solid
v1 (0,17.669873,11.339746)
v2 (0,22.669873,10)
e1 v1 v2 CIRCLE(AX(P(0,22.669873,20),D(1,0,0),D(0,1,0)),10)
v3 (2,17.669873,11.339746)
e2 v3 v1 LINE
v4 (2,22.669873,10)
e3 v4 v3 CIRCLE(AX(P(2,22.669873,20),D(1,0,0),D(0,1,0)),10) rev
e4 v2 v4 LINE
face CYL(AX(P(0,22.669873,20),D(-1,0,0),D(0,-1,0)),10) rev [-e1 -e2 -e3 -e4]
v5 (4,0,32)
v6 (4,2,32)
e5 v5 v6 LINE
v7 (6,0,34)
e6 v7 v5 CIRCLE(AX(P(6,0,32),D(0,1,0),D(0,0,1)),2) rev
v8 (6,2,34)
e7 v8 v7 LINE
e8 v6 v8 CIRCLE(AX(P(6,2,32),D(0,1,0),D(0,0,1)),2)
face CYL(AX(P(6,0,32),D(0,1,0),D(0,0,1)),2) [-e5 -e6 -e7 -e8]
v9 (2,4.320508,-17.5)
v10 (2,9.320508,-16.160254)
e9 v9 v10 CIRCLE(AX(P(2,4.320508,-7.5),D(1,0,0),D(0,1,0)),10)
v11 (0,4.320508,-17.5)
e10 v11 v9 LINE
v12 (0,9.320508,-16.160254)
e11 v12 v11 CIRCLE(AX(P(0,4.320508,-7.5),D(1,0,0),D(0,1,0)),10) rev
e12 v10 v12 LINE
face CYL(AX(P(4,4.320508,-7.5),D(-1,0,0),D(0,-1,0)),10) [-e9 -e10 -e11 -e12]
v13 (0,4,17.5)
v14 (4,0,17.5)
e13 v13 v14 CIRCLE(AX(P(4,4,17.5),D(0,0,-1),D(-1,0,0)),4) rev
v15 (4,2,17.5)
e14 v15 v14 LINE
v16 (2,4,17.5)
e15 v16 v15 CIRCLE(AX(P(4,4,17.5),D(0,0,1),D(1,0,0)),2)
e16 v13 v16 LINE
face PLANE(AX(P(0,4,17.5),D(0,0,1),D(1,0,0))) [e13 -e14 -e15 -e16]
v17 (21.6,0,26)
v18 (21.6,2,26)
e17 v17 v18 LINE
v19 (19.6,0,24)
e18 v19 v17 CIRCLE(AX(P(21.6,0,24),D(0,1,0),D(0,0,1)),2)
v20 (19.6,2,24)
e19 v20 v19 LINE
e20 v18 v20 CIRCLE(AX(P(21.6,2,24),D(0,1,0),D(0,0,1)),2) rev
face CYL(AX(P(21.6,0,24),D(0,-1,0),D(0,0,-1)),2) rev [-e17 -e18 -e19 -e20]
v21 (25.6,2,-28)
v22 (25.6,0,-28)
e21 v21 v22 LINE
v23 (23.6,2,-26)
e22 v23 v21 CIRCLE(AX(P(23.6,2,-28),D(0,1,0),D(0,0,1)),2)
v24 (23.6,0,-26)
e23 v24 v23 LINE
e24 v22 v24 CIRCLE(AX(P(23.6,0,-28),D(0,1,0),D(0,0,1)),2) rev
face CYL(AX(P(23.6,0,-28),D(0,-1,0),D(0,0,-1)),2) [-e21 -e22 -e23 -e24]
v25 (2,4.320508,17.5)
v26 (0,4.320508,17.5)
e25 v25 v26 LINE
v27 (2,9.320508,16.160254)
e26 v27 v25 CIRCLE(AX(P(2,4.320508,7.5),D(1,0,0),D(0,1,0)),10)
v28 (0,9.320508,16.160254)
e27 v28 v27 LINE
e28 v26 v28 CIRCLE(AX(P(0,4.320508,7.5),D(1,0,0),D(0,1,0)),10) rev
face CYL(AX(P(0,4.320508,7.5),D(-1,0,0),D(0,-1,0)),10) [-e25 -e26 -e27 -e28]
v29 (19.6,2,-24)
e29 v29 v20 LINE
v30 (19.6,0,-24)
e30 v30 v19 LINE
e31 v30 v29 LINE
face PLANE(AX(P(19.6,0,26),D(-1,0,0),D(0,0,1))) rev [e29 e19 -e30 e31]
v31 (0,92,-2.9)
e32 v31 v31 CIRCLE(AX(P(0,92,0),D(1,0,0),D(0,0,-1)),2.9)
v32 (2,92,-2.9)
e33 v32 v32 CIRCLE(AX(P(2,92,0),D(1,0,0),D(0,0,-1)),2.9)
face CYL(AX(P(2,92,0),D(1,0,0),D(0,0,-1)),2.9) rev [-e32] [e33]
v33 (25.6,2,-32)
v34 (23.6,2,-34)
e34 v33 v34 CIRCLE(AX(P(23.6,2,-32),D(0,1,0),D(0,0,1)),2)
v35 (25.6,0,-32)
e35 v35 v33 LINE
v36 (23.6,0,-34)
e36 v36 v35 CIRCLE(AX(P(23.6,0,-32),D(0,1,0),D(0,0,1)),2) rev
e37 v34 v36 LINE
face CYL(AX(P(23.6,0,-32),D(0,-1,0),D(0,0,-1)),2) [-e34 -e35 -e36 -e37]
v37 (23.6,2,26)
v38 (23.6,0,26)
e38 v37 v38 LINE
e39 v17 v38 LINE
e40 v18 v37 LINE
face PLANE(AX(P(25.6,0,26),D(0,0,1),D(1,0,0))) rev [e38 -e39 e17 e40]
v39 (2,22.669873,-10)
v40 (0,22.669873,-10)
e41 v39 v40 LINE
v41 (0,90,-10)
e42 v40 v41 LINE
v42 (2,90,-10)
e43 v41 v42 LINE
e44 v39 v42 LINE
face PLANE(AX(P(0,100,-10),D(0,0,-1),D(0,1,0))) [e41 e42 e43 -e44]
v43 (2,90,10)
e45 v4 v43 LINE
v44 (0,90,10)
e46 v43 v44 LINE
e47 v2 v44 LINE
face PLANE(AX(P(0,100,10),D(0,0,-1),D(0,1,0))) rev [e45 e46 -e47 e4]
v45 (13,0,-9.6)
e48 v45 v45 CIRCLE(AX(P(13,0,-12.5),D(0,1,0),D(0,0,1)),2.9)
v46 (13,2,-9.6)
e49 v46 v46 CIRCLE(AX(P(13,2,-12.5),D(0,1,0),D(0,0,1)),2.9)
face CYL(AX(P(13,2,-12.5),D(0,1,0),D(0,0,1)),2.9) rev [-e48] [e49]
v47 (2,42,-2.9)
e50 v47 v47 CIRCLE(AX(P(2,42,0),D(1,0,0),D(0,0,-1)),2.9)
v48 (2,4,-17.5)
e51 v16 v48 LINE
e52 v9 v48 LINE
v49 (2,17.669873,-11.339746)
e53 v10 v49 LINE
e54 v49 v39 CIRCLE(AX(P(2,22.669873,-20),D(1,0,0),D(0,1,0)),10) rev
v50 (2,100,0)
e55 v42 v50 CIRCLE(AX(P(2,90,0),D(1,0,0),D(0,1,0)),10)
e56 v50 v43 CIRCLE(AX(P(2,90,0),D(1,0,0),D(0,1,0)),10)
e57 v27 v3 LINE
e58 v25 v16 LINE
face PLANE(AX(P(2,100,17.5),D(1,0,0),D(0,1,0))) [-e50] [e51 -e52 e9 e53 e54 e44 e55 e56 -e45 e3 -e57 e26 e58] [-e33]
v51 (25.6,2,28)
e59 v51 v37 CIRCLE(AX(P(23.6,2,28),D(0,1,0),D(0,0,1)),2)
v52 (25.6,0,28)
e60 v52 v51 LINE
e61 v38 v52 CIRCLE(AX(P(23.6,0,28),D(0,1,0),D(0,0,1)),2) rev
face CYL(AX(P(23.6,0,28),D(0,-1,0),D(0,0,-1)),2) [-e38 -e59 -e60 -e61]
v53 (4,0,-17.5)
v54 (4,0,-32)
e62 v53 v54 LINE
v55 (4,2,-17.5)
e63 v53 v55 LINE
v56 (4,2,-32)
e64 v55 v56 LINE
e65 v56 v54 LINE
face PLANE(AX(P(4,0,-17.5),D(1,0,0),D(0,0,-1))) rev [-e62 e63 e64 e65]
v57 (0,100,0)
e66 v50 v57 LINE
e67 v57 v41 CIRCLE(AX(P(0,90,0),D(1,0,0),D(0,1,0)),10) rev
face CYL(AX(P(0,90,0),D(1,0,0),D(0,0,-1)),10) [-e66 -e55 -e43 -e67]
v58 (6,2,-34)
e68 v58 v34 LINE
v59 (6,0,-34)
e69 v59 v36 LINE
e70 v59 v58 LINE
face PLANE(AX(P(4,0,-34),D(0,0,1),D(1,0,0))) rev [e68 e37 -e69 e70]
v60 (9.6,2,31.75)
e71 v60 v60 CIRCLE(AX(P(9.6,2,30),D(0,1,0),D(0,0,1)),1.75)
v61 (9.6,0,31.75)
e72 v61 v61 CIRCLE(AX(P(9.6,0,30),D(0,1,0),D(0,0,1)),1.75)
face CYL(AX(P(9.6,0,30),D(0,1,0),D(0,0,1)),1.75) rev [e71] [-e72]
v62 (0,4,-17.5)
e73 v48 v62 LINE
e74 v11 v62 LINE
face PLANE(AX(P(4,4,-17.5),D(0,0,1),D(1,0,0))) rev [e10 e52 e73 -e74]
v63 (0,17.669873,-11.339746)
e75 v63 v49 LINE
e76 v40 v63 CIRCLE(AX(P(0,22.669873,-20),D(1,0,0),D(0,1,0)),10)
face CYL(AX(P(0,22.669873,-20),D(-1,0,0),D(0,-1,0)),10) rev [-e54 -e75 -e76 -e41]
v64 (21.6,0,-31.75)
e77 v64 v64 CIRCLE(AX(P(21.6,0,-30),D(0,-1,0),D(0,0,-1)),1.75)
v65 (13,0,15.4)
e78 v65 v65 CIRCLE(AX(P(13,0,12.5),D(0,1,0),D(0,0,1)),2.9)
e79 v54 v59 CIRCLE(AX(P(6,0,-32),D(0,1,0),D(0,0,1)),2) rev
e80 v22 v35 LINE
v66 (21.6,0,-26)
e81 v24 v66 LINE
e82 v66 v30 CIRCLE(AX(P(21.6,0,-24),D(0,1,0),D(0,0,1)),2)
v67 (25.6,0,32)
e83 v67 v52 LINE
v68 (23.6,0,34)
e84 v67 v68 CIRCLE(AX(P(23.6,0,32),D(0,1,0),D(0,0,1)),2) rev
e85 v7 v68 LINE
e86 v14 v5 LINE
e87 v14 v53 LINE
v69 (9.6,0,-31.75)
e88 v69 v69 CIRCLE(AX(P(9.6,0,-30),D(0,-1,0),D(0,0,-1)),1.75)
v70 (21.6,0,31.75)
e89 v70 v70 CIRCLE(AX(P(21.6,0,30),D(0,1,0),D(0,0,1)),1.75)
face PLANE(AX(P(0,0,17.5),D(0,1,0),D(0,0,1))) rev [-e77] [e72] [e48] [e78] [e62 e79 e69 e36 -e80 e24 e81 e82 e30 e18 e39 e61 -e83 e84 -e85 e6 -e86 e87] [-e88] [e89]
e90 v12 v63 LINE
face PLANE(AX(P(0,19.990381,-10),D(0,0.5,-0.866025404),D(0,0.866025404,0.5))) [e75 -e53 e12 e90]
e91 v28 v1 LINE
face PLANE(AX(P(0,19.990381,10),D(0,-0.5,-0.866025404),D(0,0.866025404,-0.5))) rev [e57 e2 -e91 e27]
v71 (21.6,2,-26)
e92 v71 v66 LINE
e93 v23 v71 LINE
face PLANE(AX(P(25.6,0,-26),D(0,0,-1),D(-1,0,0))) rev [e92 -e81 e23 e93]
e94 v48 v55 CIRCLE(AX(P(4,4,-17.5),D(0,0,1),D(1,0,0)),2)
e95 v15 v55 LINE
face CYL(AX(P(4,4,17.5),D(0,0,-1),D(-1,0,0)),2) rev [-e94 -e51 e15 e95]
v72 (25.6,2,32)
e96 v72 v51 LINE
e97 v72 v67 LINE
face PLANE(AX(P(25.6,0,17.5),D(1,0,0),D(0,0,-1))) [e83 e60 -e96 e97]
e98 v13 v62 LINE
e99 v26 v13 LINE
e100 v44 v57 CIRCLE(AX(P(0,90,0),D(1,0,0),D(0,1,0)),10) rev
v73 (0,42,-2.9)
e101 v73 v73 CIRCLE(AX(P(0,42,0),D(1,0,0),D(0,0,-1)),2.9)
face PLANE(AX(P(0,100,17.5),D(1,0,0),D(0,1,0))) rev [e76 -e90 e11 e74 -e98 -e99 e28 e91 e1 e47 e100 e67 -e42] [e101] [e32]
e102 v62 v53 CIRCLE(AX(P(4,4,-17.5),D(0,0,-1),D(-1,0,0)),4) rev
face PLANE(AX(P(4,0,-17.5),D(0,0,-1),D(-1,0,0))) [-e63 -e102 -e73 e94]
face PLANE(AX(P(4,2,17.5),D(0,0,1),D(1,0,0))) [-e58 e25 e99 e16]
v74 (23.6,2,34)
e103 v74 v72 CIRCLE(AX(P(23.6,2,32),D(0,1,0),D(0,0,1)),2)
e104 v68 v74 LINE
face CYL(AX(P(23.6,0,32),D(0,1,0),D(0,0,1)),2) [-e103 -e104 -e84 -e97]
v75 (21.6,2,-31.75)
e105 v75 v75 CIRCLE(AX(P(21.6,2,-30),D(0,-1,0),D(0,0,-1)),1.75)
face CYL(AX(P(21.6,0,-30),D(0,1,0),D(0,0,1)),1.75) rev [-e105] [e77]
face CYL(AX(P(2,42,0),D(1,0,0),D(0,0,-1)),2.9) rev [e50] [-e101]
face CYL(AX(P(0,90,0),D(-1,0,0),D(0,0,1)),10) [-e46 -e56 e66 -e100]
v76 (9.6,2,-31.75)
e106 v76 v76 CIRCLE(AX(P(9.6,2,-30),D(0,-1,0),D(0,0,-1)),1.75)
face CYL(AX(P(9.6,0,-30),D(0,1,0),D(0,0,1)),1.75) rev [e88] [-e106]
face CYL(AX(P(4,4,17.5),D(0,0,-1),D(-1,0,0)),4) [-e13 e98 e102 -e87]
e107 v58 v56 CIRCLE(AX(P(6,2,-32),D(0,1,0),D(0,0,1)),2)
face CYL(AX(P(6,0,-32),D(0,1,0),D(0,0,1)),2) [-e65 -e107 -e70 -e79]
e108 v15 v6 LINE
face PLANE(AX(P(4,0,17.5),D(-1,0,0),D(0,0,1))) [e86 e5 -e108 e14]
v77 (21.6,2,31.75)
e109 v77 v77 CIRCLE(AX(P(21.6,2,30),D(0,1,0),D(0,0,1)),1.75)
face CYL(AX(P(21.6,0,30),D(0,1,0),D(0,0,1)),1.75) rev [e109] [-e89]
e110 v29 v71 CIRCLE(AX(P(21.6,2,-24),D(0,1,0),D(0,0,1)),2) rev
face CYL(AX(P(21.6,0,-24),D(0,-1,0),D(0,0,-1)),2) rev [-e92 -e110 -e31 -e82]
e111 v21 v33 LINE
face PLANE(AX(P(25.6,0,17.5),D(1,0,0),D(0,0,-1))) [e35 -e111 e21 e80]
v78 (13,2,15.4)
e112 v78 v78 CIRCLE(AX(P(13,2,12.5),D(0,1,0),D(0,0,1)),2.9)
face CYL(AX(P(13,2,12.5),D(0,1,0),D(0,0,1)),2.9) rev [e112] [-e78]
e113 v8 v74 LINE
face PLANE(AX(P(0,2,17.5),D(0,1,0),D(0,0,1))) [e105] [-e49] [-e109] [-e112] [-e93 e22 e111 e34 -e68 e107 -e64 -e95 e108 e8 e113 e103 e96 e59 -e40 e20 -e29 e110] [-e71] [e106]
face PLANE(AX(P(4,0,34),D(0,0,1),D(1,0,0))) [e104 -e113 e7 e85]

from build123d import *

# Parameters (mm, degrees)
BASE_FLANGE1_DEPTH   = 17.5
M5_CLEARANCE_HOLE2_D = 5.8
M5_CLEARANCE_HOLE1_D = 5.8
CUT_EXTRUDE3_DEPTH   = 2
SKETCH21_R           = 1.75
BOSS_EXTRUDE1_DEPTH  = 2
SKETCH22_W           = 6
SKETCH22_H           = 52
CUT_EXTRUDE4_DEPTH   = 10
FILLET1_R            = 2
FILLET2_R            = 10


# Sheet-metal steps are written as plain solids
with BuildPart() as part:
    # Sketch1 → Base-Flange1 (new, symmetric)
    with BuildSketch(Plane.XY):
        with BuildLine():
            Line((0, 100), (0, 4))
            ThreePointArc((0, 4), (1.171572875, 1.171572875), (4, 0))
            Line((4, 0), (19, 0))
            Line((19, 0), (19, 2))
            Line((19, 2), (4, 2))
            ThreePointArc((4, 2), (2.585786438, 2.585786438), (2, 4))
            Line((2, 4), (2, 100))
            Line((2, 100), (0, 100))
        make_face()
    extrude(amount=BASE_FLANGE1_DEPTH, both=True)

    # M5 Clearance Hole2 (through all)
    with Locations(Plane(origin=(0, 2, 0), x_dir=(1, 0, 0), z_dir=(0, 1, 0))):
        with Locations((13, -12.5), (13, 12.5)):
            Hole(M5_CLEARANCE_HOLE2_D / 2)

    # M5 Clearance Hole1 (through all)
    with Locations(Plane(origin=(2, 0, 0), x_dir=(0, 0, -1), z_dir=(1, 0, 0))):
        with Locations((0, 92), (0, 42)):
            Hole(M5_CLEARANCE_HOLE1_D / 2)

    # Sketch20 → Cut-Extrude3 (cut)
    with BuildSketch(Plane(origin=(2, 0, 0), x_dir=(0, 0, -1), z_dir=(1, 0, 0))):
        Polygon((-10, 100), (-10, 19.990381057), (-17.5, 7), (-17.5, 100), align=None)
    cut_extrude3 = extrude(amount=-CUT_EXTRUDE3_DEPTH, mode=Mode.SUBTRACT)

    # Mirror1: Cut-Extrude3 across plane
    add(cut_extrude3.mirror(Plane.XY), mode=Mode.SUBTRACT)

    # Sketch21 → Boss-Extrude1 (add)
    with BuildSketch(Plane(origin=(0, 2, 0), x_dir=(1, 0, 0), z_dir=(0, 1, 0))):
        Polygon((4, -17.5), (19, -17.5), (19, 0), (25.6, 0), (25.6, -17.5), (25.6, -34), (4, -34), align=None)
        with Locations(Location((9.6, -30, 0), (0, 0, 270))):
            Circle(SKETCH21_R, mode=Mode.SUBTRACT)
        with Locations(Location((21.6, -30, 0), (0, 0, 270))):
            Circle(SKETCH21_R, mode=Mode.SUBTRACT)
    boss_extrude1 = extrude(amount=-BOSS_EXTRUDE1_DEPTH)

    # Mirror2: Boss-Extrude1 across plane
    add(boss_extrude1.mirror(Plane.XY))

    # Sketch22 → Cut-Extrude4 (cut)
    with BuildSketch(Plane(origin=(0, 2, 0), x_dir=(1, 0, 0), z_dir=(0, 1, 0))):
        with Locations((22.6, 0)):
            Rectangle(SKETCH22_W, SKETCH22_H)
    extrude(amount=-CUT_EXTRUDE4_DEPTH, mode=Mode.SUBTRACT)

    # Fillet1
    fillet1_edges = [part.edges().sort_by_distance(p)[0] for p in [
        (4, 1, 34),
        (25.6, 1, 34),
        (4, 1, -34),
        (25.6, 1, -34),
        (25.6, 1, -26),
        (25.6, 1, 26),
        (19.6, 1, 26),
        (19.6, 1, -26),
    ]]
    fillet(fillet1_edges, radius=FILLET1_R)

    # Fillet2
    fillet2_edges = [part.edges().sort_by_distance(p)[0] for p in [
        (1, 7, 17.5),
        (1, 7, -17.5),
        (1, 19.990381057, 10),
        (1, 19.990381057, -10),
        (1, 100, 10),
        (1, 100, -10),
    ]]
    fillet(fillet2_edges, radius=FILLET2_R - 0.0001)  # a hair under: the kernel refuses the full size


solid = part.part
